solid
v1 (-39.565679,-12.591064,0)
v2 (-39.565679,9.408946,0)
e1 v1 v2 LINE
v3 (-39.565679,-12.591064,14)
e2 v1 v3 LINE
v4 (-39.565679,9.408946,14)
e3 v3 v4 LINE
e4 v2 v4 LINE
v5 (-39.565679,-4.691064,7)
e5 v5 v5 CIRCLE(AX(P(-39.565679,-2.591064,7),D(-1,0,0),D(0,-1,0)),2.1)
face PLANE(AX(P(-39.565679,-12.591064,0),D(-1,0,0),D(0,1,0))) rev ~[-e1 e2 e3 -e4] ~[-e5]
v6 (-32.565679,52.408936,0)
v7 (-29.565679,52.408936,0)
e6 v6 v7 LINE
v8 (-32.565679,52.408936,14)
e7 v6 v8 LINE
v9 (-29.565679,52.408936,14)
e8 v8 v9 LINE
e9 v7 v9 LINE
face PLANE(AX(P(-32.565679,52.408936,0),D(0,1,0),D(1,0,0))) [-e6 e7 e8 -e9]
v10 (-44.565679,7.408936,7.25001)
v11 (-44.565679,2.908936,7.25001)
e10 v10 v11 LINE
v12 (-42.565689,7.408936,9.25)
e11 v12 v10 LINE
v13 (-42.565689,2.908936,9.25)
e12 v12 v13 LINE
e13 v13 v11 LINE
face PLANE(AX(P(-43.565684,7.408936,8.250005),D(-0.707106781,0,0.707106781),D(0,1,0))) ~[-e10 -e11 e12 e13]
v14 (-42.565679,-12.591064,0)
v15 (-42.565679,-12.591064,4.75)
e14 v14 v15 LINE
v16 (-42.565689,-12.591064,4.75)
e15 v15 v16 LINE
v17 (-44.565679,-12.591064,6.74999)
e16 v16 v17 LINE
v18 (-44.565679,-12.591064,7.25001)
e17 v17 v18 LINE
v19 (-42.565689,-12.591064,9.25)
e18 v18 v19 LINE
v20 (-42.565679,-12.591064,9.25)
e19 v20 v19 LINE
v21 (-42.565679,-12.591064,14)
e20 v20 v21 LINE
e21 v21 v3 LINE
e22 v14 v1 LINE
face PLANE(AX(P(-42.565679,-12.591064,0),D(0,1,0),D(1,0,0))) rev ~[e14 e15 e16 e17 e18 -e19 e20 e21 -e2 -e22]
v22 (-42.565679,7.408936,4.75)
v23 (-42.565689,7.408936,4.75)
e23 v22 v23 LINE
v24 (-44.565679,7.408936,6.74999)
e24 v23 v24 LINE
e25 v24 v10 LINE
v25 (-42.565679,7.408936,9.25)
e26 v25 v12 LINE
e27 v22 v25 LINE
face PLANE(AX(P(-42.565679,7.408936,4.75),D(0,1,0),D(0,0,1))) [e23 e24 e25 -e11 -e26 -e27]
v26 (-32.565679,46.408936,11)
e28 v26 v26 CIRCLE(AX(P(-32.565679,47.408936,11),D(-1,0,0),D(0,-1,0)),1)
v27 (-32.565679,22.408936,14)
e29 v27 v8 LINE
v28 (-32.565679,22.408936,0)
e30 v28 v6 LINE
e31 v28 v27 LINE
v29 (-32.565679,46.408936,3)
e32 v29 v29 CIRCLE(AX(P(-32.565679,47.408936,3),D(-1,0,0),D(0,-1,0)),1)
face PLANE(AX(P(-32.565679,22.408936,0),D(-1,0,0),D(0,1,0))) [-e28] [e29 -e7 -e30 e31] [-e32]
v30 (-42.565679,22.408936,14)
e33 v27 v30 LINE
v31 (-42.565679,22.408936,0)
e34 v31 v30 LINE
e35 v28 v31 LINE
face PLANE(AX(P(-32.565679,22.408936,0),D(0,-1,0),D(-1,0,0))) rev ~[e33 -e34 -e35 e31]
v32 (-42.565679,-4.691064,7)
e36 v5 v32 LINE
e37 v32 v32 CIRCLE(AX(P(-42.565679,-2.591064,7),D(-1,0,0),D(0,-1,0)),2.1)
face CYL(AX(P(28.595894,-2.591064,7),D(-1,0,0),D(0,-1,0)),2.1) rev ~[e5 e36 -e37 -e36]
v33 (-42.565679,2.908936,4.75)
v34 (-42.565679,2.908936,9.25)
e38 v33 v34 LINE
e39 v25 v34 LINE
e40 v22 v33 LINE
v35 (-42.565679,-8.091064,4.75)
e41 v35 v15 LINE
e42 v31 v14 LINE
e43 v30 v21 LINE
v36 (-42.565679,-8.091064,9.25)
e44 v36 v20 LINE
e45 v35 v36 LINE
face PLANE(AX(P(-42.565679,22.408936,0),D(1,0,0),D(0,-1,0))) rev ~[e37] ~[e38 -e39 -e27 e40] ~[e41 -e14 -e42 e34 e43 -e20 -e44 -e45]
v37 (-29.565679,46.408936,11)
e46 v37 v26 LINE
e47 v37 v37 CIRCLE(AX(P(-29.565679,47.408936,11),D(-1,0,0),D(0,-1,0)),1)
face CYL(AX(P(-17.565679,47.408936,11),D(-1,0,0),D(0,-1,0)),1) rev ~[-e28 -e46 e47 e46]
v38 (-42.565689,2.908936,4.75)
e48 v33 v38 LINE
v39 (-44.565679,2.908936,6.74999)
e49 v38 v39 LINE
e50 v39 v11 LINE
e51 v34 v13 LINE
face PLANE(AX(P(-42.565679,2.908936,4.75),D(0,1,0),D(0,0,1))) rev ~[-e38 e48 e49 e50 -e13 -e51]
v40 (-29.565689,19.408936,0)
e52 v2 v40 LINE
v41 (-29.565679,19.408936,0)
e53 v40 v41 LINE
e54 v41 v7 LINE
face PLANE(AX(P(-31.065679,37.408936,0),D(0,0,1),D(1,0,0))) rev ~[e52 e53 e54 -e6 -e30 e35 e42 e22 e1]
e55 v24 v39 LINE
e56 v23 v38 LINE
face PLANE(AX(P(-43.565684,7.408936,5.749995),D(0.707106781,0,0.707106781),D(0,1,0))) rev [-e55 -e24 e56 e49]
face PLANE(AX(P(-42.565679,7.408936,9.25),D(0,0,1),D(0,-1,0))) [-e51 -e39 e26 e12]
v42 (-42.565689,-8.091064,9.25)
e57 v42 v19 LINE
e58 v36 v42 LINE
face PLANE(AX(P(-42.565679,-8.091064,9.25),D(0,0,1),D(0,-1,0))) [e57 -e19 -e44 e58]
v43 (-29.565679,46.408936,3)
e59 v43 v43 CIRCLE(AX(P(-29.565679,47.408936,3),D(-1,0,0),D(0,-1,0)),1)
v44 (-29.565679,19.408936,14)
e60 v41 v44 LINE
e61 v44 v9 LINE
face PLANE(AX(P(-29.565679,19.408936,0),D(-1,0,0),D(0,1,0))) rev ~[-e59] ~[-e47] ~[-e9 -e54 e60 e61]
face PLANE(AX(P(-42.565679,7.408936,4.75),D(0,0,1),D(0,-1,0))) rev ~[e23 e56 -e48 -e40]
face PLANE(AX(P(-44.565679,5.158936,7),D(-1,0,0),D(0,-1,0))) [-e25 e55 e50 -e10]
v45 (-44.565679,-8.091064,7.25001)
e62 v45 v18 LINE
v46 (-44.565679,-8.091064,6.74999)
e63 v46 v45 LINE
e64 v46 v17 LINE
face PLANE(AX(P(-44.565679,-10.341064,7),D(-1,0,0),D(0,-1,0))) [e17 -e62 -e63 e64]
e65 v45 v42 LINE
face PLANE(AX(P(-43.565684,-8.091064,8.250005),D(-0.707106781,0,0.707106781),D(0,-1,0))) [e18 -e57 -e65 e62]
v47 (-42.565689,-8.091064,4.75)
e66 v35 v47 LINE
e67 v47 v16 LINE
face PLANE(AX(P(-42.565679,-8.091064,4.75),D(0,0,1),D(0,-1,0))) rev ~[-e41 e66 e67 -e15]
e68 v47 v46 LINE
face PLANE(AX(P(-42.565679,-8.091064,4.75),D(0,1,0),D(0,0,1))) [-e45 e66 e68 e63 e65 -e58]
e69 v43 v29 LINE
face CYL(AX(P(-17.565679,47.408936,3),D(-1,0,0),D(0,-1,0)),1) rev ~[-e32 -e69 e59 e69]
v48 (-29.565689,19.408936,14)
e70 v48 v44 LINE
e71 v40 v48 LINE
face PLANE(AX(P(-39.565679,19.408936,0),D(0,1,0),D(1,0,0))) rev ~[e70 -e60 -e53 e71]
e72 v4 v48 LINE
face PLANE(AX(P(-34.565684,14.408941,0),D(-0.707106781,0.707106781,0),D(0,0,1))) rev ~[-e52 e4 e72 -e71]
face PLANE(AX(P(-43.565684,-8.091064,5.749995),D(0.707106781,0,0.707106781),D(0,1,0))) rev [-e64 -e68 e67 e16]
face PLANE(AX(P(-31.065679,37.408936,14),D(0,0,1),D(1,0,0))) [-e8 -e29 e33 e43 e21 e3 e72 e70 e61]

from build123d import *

# Parameters (mm, degrees)
F0_W     = 3
F0_H     = 30
F0_H_2   = 32
F1_DEPTH = 14
F3_D     = 2
F3_DEPTH = 12
F3_TIP   = 0.600860619
F4_W     = 4.5
F4_H     = 4.5
F5_DEPTH = 2
F7_D     = 4.2
F8_SIZE  = 9.99999
F9_SIZE  = 1.99999


# Not quite as in the source:
# - a fillet or chamfer is up to 0.001 mm smaller than in the source, because OpenCascade refuses the exact size


with BuildPart() as f1:
    # F0 (on Top) → F1 (new body)
    with BuildSketch(Plane.XY):
        with Locations((-31.0656790137, 37.4089360237)):
            Rectangle(F0_W, F0_H)
        Polygon((-29.5656790137, 22.4089360237), (-32.5656790137, 22.4089360237), (-42.5656790137, 22.4089360237), (-42.5656790137, 19.4089360237), (-39.5656790137, 19.4089360237), (-29.5656790137, 19.4089360237), align=None)
        with Locations((-41.0656790137, 3.4089360237)):
            Rectangle(F0_W, F0_H_2)
    extrude(amount=F1_DEPTH)

    # F3
    with Locations(Plane.YZ.offset(-29.5656790137)):
        with Locations((47.4089360237, 11), (47.4089360237, 3)):
            Hole(F3_D / 2, depth=F3_DEPTH)
            with Locations((0, 0, -(F3_DEPTH + F3_TIP / 2))):  # 118° drill point
                Cone(0, F3_D / 2, F3_TIP, mode=Mode.SUBTRACT)

    # F4 (on face) → F5 (join)
    with BuildSketch(Plane(origin=(-42.5656790137, 0, 0), x_dir=(0, -1, 0), z_dir=(-1, 0, 0))):
        with Locations((-5.1589360237, 7)):
            Rectangle(F4_W, F4_H)
        with Locations((10.3410639763, 7)):
            Rectangle(F4_W, F4_H)
    extrude(amount=F5_DEPTH)

    # F7 (through all)
    with Locations(Plane.YZ.offset(-39.5656790137)):
        with Locations((-2.5910639763, 7)):
            Hole(F7_D / 2)

    # F8 (size 10 in the source; OpenCascade refuses exactly that, so slightly less here)
    f8_edges = [f1.edges().sort_by_distance(p)[0] for p in [
        (-39.565679, 19.408936, 7),
    ]]
    chamfer(f8_edges, length=F8_SIZE)

    # F9 (size 2 in the source; OpenCascade refuses exactly that, so slightly less here)
    f9_edges = [f1.edges().sort_by_distance(p)[0] for p in [
        (-44.565679, 5.158936, 4.75),
        (-44.565679, -10.341064, 4.75),
        (-44.565679, -10.341064, 9.25),
        (-44.565679, 5.158936, 9.25),
    ]]
    chamfer(f9_edges, length=F9_SIZE)


solid = f1.part
